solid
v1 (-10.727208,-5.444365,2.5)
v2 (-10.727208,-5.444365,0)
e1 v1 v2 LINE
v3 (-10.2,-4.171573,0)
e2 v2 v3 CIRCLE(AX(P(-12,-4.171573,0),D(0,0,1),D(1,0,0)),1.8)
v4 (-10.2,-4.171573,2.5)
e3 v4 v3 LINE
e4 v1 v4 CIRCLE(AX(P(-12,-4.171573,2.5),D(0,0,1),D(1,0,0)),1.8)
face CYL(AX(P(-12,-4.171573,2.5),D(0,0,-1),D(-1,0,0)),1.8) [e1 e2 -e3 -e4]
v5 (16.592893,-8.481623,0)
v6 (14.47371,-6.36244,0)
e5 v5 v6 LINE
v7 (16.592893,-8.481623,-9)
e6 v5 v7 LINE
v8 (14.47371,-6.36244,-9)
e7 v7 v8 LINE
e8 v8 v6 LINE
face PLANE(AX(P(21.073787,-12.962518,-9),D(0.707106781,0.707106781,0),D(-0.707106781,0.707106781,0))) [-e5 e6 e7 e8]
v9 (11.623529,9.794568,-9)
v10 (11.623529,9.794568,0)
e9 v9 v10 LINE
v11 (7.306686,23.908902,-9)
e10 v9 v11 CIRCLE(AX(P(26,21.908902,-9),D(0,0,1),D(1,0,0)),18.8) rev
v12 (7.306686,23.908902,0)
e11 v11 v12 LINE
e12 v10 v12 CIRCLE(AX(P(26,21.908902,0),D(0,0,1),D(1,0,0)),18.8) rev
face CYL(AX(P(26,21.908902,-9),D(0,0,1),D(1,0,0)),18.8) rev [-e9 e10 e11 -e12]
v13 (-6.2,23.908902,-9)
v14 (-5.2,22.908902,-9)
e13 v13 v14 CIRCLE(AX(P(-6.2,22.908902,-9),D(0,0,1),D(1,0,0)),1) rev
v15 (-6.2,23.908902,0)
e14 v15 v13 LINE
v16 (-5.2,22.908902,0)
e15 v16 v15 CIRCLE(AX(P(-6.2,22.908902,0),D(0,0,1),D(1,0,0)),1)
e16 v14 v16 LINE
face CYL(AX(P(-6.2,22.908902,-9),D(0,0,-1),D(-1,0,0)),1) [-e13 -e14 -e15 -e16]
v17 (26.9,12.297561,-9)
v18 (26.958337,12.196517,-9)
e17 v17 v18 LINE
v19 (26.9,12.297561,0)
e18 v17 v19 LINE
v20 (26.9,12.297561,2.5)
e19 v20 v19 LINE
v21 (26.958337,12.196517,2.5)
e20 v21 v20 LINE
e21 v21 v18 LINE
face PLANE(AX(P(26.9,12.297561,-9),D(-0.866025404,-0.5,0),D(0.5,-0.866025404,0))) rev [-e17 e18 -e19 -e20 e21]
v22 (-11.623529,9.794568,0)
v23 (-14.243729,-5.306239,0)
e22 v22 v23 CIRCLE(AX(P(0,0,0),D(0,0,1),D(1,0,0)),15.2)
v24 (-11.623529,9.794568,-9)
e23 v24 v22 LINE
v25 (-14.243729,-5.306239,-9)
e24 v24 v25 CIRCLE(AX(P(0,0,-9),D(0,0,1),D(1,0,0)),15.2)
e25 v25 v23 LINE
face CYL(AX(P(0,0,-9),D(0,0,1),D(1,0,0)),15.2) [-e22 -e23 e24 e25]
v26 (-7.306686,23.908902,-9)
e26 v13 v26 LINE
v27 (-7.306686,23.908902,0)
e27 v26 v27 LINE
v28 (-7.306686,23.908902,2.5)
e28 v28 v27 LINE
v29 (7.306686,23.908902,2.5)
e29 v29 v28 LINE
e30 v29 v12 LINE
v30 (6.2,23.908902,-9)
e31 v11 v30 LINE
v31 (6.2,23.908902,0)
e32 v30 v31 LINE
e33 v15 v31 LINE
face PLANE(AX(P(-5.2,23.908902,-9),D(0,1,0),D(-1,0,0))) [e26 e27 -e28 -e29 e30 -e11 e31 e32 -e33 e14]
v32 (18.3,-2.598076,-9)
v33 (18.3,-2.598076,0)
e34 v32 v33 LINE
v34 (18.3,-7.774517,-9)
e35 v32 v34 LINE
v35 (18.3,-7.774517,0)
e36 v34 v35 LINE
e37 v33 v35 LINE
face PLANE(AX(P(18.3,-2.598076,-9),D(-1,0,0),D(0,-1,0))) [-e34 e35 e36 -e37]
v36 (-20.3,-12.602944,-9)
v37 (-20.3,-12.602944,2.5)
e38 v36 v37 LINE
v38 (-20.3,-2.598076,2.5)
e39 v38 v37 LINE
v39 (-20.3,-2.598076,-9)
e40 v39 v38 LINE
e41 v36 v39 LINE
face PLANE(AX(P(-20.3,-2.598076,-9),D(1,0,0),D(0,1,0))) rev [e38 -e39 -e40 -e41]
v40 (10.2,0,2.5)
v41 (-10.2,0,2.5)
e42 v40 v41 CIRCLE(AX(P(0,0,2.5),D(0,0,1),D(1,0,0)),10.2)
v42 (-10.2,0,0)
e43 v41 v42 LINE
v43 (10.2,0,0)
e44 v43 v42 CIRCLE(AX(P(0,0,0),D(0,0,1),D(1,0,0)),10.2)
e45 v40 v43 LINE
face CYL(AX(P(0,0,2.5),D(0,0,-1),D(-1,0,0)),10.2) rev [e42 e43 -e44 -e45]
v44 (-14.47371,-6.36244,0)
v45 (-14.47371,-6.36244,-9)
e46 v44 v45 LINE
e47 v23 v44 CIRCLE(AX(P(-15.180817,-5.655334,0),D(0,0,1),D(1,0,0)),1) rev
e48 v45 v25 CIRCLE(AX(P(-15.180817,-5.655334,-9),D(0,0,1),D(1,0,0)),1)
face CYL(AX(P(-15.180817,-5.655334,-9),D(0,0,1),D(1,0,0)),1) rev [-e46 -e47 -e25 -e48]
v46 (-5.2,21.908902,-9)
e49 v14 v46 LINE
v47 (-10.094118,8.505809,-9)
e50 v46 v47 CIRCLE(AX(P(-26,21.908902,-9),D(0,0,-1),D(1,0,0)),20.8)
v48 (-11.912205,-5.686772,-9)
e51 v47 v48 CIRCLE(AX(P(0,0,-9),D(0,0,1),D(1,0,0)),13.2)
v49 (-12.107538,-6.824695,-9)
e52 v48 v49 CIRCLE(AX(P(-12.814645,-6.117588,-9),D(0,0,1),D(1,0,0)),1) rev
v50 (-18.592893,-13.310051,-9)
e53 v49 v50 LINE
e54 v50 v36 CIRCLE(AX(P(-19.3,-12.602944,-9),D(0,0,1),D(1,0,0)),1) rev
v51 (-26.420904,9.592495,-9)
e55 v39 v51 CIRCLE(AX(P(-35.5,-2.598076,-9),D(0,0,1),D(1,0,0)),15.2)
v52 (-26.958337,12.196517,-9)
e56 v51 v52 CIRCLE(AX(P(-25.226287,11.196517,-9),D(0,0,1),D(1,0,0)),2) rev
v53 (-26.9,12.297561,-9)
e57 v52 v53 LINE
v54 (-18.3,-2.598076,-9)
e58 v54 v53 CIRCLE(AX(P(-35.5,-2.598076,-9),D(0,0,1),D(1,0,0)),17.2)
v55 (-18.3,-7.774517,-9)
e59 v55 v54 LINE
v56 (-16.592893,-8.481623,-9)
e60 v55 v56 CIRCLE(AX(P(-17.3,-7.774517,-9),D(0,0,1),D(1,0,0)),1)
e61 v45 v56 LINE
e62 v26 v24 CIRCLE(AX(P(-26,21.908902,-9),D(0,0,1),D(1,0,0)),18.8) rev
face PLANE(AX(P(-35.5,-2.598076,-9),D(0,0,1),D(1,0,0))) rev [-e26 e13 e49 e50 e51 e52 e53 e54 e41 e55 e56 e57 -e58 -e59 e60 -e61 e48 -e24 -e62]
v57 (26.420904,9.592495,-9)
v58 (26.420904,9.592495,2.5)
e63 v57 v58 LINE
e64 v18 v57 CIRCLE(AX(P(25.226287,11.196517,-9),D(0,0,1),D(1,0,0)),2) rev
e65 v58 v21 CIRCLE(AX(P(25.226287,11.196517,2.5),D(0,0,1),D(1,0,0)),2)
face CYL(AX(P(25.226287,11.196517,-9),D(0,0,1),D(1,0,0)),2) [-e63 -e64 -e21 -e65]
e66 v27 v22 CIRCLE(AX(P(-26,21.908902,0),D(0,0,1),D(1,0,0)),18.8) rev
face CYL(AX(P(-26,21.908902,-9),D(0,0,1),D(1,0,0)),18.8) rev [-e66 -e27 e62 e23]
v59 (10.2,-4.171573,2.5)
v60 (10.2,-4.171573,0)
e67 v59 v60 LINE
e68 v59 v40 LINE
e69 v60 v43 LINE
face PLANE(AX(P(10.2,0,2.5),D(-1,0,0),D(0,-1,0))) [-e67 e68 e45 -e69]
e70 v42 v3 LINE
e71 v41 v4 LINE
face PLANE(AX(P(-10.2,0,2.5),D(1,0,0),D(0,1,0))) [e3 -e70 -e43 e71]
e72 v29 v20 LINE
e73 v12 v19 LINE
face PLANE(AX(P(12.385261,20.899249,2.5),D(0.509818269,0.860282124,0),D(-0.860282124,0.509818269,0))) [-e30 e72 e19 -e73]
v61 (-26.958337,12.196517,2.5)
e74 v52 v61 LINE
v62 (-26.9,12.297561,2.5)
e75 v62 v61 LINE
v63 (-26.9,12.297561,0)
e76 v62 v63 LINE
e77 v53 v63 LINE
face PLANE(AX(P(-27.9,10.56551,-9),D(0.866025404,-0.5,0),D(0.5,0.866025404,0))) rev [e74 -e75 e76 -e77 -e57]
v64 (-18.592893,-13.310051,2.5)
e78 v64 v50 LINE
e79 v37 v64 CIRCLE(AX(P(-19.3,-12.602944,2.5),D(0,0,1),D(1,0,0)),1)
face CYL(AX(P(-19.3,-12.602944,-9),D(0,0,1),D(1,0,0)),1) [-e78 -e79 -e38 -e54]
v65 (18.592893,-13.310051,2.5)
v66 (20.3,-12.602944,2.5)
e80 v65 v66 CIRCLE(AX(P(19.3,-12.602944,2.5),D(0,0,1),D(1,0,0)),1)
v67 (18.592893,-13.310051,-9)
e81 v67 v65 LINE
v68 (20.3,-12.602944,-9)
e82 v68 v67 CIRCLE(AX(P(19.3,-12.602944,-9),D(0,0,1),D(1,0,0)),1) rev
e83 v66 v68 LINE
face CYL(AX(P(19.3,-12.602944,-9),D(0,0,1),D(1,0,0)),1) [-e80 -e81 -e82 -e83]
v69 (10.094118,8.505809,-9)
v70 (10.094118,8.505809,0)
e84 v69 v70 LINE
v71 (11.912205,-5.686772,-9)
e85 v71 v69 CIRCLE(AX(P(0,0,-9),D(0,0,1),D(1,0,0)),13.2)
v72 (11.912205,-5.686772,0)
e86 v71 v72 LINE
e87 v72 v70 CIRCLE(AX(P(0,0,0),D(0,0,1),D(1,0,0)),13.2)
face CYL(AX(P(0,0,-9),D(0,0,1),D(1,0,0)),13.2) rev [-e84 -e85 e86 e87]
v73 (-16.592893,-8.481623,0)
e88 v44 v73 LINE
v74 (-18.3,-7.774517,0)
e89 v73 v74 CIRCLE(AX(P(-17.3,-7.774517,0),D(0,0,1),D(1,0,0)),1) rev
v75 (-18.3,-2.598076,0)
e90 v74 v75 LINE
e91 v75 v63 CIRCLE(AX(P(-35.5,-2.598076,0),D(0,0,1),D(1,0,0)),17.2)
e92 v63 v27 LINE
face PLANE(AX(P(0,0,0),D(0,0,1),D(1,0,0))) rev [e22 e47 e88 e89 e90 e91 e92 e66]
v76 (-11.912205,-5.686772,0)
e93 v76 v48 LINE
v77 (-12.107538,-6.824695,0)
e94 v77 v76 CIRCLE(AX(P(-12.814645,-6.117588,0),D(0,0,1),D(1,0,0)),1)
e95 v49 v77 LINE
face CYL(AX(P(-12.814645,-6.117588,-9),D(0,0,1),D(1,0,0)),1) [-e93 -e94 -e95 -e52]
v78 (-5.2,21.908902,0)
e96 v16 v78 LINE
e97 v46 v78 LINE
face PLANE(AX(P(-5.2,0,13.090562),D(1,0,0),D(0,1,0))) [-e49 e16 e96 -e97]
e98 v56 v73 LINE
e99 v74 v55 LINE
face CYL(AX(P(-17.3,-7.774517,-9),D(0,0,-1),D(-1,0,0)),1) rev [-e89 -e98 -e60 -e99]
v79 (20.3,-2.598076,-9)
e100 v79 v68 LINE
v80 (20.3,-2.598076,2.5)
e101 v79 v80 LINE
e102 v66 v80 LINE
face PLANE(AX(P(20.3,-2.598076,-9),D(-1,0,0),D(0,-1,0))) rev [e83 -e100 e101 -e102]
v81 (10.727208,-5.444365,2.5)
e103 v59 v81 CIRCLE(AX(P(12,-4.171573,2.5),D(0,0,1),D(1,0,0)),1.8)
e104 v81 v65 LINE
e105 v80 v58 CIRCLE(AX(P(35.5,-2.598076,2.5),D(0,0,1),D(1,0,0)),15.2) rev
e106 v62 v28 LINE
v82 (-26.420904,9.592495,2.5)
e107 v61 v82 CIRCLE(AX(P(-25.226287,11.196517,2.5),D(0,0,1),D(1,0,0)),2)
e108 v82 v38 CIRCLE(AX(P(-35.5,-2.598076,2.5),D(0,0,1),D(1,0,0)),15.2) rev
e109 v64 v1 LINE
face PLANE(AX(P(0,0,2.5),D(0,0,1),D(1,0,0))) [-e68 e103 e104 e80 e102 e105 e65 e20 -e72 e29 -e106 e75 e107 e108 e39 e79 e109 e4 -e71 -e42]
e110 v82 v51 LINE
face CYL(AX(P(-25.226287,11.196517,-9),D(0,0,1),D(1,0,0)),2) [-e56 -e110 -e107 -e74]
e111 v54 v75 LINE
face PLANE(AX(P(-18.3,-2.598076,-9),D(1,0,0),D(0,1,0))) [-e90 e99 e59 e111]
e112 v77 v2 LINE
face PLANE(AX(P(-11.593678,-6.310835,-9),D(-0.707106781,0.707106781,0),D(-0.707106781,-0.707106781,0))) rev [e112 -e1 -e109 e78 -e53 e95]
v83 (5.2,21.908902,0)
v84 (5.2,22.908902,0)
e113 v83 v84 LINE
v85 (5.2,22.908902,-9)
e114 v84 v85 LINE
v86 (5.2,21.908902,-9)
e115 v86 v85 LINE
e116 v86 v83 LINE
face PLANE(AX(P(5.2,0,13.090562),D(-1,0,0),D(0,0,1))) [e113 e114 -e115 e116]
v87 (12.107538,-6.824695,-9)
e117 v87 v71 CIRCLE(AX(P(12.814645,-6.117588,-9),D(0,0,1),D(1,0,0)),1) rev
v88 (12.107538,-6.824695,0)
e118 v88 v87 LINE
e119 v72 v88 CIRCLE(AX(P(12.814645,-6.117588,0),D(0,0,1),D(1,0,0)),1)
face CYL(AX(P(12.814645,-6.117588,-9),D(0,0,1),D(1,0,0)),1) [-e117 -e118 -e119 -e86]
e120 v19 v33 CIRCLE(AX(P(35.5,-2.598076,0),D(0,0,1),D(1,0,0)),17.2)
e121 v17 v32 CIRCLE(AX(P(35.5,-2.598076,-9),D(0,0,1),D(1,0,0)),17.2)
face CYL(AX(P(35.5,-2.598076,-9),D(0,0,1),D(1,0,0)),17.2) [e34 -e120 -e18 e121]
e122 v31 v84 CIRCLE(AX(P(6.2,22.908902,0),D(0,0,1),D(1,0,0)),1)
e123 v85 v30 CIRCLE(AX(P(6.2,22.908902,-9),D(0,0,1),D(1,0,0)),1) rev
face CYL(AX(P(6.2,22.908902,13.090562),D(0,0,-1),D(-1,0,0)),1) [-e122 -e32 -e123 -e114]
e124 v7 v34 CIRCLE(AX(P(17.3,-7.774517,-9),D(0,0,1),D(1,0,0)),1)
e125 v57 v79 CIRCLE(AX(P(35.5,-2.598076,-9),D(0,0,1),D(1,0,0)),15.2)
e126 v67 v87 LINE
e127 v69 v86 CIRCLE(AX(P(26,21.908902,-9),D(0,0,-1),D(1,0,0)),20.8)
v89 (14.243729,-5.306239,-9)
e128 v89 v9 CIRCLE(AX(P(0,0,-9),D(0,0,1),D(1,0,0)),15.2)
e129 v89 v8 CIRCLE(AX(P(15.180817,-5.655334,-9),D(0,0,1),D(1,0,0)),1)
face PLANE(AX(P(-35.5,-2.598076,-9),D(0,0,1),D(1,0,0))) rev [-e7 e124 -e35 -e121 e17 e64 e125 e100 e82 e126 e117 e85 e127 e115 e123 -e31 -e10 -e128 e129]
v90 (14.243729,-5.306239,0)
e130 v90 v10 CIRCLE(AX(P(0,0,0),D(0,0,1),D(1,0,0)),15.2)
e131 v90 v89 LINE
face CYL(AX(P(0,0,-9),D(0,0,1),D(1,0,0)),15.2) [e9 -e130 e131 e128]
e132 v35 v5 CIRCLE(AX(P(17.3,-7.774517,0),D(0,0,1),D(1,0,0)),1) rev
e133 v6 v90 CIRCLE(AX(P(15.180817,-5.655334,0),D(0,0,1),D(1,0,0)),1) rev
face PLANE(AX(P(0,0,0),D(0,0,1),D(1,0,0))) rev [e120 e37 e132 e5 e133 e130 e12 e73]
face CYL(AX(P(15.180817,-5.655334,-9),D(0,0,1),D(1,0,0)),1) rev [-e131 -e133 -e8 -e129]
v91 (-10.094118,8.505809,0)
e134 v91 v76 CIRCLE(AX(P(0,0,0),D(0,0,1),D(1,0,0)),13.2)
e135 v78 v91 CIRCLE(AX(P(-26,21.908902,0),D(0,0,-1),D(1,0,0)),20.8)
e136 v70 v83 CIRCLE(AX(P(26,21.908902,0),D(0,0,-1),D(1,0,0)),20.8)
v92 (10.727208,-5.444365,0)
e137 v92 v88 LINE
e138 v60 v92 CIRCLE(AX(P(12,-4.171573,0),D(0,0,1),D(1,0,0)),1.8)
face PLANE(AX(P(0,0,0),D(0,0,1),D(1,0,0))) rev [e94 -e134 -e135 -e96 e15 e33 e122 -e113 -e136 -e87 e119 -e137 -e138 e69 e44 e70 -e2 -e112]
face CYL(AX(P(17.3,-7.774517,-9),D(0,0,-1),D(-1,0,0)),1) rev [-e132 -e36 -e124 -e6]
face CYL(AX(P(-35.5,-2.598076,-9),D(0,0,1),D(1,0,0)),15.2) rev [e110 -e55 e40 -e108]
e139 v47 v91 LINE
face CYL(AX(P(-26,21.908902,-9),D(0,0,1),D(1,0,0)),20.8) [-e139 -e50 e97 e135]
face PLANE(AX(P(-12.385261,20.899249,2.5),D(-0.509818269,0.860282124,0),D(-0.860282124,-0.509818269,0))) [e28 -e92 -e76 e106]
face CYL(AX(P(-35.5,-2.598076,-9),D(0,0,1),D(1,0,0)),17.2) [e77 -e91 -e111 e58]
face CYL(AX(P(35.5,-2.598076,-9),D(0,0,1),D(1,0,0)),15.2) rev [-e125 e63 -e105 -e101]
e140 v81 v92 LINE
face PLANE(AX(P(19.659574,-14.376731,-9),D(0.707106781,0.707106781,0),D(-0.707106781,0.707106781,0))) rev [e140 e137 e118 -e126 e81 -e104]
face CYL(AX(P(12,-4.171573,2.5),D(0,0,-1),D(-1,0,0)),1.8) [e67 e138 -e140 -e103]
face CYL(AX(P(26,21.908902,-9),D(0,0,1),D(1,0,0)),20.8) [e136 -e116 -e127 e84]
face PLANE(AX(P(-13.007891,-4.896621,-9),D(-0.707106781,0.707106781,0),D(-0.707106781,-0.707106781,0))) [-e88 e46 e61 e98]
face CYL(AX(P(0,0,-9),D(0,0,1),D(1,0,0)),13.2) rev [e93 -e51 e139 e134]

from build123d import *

# Parameters (mm, degrees)
EXTRUDE_THIN1_DEPTH = 9
BOSS_EXTRUDE1_START = 2.5
BOSS_EXTRUDE1_DEPTH = 2.5
SKETCH7_W           = 10.4
SKETCH7_H           = 2
CUT_EXTRUDE2_DEPTH  = 9
FILLET1_R           = 2
FILLET2_R           = 1
FILLET3_R           = 1


with BuildPart() as part:
    # Sketch4 → Extrude-Thin1 (new body)
    with BuildSketch(Plane.XY):
        with BuildLine():
            ThreePointArc((-27.9, 10.565509926), (-22.336413862, 5.001923789), (-20.3, -2.598076211))
            Line((-20.3, -2.598076211), (-20.3, -13))
            ThreePointArc((-20.3, -13), (-20.132058957, -13.759199288), (-19.659573823, -14.37673111))
            Line((-19.659573823, -14.37673111), (-11.593677676, -6.310834964))
            ThreePointArc((-11.593677676, -6.310834964), (-13.132911027, 1.329153101), (-10.094117647, 8.505809128))
            ThreePointArc((-10.094117647, 8.505809128), (-6.461802118, 14.774561158), (-5.2, 21.9089023))
            Line((-5.2, 21.9089023), (5.2, 21.9089023))
            ThreePointArc((5.2, 21.9089023), (6.461802118, 14.774561158), (10.094117647, 8.505809128))
            ThreePointArc((10.094117647, 8.505809128), (13.132911027, 1.329153101), (11.593677676, -6.310834964))
            Line((11.593677676, -6.310834964), (19.659573823, -14.37673111))
            ThreePointArc((19.659573823, -14.37673111), (20.132058957, -13.759199288), (20.3, -13))
            Line((20.3, -13), (20.3, -2.598076211))
            ThreePointArc((20.3, -2.598076211), (22.336413862, 5.001923789), (27.9, 10.565509926))
            Line((27.9, 10.565509926), (26.9, 12.297560734))
            ThreePointArc((26.9, 12.297560734), (20.604363055, 6.001923789), (18.3, -2.598076211))
            Line((18.3, -2.598076211), (18.3, -10.188730163))
            Line((18.3, -10.188730163), (14.009117998, -5.897848161))
            ThreePointArc((14.009117998, -5.897848161), (15.027346247, 2.28448348), (11.623529412, 9.794568087))
            ThreePointArc((11.623529412, 9.794568087), (8.022061411, 16.410382128), (7.306685687, 23.9089023))
            Line((7.306685687, 23.9089023), (-7.306685687, 23.9089023))
            ThreePointArc((-7.306685687, 23.9089023), (-8.022061411, 16.410382128), (-11.623529412, 9.794568087))
            ThreePointArc((-11.623529412, 9.794568087), (-15.027346247, 2.28448348), (-14.009117998, -5.897848161))
            Line((-14.009117998, -5.897848161), (-18.3, -10.188730163))
            Line((-18.3, -10.188730163), (-18.3, -2.598076211))
            ThreePointArc((-18.3, -2.598076211), (-20.604363055, 6.001923789), (-26.9, 12.297560734))
            Line((-26.9, 12.297560734), (-27.9, 10.565509926))
        make_face()
    extrude(amount=-EXTRUDE_THIN1_DEPTH)

    # Sketch5 → Boss-Extrude1 (add)
    with BuildSketch(Plane.XY.offset(BOSS_EXTRUDE1_START)):
        with BuildLine():
            Line((-26.9, 12.297560734), (-7.306685687, 23.9089023))
            ThreePointArc((-7.306685687, 23.9089023), (-8.022061411, 16.410382128), (-11.623529412, 9.794568087))
            ThreePointArc((-11.623529412, 9.794568087), (-15.027346247, 2.28448348), (-14.009117998, -5.897848161))
            Line((-14.009117998, -5.897848161), (-18.3, -10.188730163))
            Line((-18.3, -10.188730163), (-18.3, -2.598076211))
            ThreePointArc((-18.3, -2.598076211), (-20.604363055, 6.001923789), (-26.9, 12.297560734))
        make_face()
        with BuildLine():
            ThreePointArc((-18.3, -2.598076211), (-20.604363055, 6.001923789), (-26.9, 12.297560734))
            Line((-26.9, 12.297560734), (-27.9, 10.565509926))
            ThreePointArc((-27.9, 10.565509926), (-22.336413862, 5.001923789), (-20.3, -2.598076211))
            Line((-20.3, -2.598076211), (-20.3, -13))
            ThreePointArc((-20.3, -13), (-20.132058957, -13.759199288), (-19.659573823, -14.37673111))
            Line((-19.659573823, -14.37673111), (-19.555634919, -14.272792206))
            Line((-19.555634919, -14.272792206), (-11.593677676, -6.310834964))
            ThreePointArc((-11.593677676, -6.310834964), (-13.132911027, 1.329153101), (-10.094117647, 8.505809128))
            ThreePointArc((-10.094117647, 8.505809128), (-6.461802118, 14.774561158), (-5.2, 21.9089023))
            Line((-5.2, 21.9089023), (5.2, 21.9089023))
            ThreePointArc((5.2, 21.9089023), (6.461802118, 14.774561158), (10.094117647, 8.505809128))
            ThreePointArc((10.094117647, 8.505809128), (13.132911027, 1.329153101), (11.593677676, -6.310834964))
            Line((11.593677676, -6.310834964), (19.555634919, -14.272792206))
            Line((19.555634919, -14.272792206), (19.659573823, -14.37673111))
            ThreePointArc((19.659573823, -14.37673111), (20.132058957, -13.759199288), (20.3, -13))
            Line((20.3, -13), (20.3, -2.598076211))
            ThreePointArc((20.3, -2.598076211), (22.336413862, 5.001923789), (27.9, 10.565509926))
            Line((27.9, 10.565509926), (26.9, 12.297560734))
            ThreePointArc((26.9, 12.297560734), (20.604363055, 6.001923789), (18.3, -2.598076211))
            Line((18.3, -2.598076211), (18.3, -10.188730163))
            Line((18.3, -10.188730163), (14.009117998, -5.897848161))
            ThreePointArc((14.009117998, -5.897848161), (15.027346247, 2.28448348), (11.623529412, 9.794568087))
            ThreePointArc((11.623529412, 9.794568087), (8.022061411, 16.410382128), (7.306685687, 23.9089023))
            Line((7.306685687, 23.9089023), (-7.306685687, 23.9089023))
            ThreePointArc((-7.306685687, 23.9089023), (-8.022061411, 16.410382128), (-11.623529412, 9.794568087))
            ThreePointArc((-11.623529412, 9.794568087), (-15.027346247, 2.28448348), (-14.009117998, -5.897848161))
            Line((-14.009117998, -5.897848161), (-18.3, -10.188730163))
            Line((-18.3, -10.188730163), (-18.3, -2.598076211))
        make_face()
        with BuildLine():
            Line((7.306685687, 23.9089023), (26.9, 12.297560734))
            ThreePointArc((26.9, 12.297560734), (20.604363055, 6.001923789), (18.3, -2.598076211))
            Line((18.3, -2.598076211), (18.3, -10.188730163))
            Line((18.3, -10.188730163), (14.009117998, -5.897848161))
            ThreePointArc((14.009117998, -5.897848161), (15.027346247, 2.28448348), (11.623529412, 9.794568087))
            ThreePointArc((11.623529412, 9.794568087), (8.022061411, 16.410382128), (7.306685687, 23.9089023))
        make_face()
        with BuildLine():
            ThreePointArc((-10.094117647, 8.505809128), (-13.132911027, 1.329153101), (-11.593677676, -6.310834964))
            Line((-11.593677676, -6.310834964), (-10.727207794, -5.444365081))
            ThreePointArc((-10.727207794, -5.444365081), (-10.337016841, -4.860403054), (-10.2, -4.171572875))
            Line((-10.2, -4.171572875), (-10.2, 0))
            ThreePointArc((-10.2, 0), (0, 10.2), (10.2, 0))
            Line((10.2, 0), (10.2, -4.171572875))
            ThreePointArc((10.2, -4.171572875), (10.337016841, -4.860403054), (10.727207794, -5.444365081))
            Line((10.727207794, -5.444365081), (11.593677676, -6.310834964))
            ThreePointArc((11.593677676, -6.310834964), (13.132911027, 1.329153101), (10.094117647, 8.505809128))
            ThreePointArc((10.094117647, 8.505809128), (6.461802118, 14.774561158), (5.2, 21.9089023))
            Line((5.2, 21.9089023), (-5.2, 21.9089023))
            ThreePointArc((-5.2, 21.9089023), (-6.461802118, 14.774561158), (-10.094117647, 8.505809128))
        make_face()
    extrude(amount=-BOSS_EXTRUDE1_DEPTH)

    # Sketch7 → Cut-Extrude2 (cut)
    with BuildSketch(Plane.XY.offset(-9)):
        with Locations((0, 22.9089023)):
            Rectangle(SKETCH7_W, SKETCH7_H)
    extrude(amount=CUT_EXTRUDE2_DEPTH, mode=Mode.SUBTRACT)

    # Fillet1
    fillet1_edges = [part.edges().sort_by_distance(p)[0] for p in [
        (27.9, 10.565509926, -3.25),
        (-27.9, 10.565509926, -3.25),
    ]]
    fillet(fillet1_edges, radius=FILLET1_R)

    # Fillet2
    # the kernel refuses this fillet: 1 mm, written as the material it takes off along each edge
    with BuildSketch(Plane(origin=(19.659573823, -14.37673111, -13.714649626), x_dir=(0.33959372810271005, 0.9405722193608009, 0), z_dir=(0, 0, 1))) as fillet2_piece_1:
        with BuildLine():
            CenterArc((1.546266122, 0.940572219), FILLET2_R, 154.852123731, 135)
            Line((0.6410521, 1.365528186), (0.550530698, 1.408023783))
            Line((0.550530698, 1.408023783), (-0.090521402, 0.042495597))
            Line((-0.090521402, 0.042495597), (-0.050062835, -0.086566232))
            ThreePointArc((-0.050062835, -0.086566232), (1.546359122, -0.228895043), (1.919819223, -0.094057222))
            Line((1.919819223, -0.094057222), (1.885859851, 0))
        make_face()
    extrude(amount=20.929299253, mode=Mode.SUBTRACT)
    with BuildSketch(Plane(origin=(-19.659573823, -14.37673111, -13.714649626), x_dir=(-0.3395937281027359, 0.9405722193607915, 0), z_dir=(0, 0, 1))) as fillet2_piece_2:
        with BuildLine():
            CenterArc((1.546266122, -0.940572219), FILLET2_R, 70.147876269, 135)
            Line((0.6410521, -1.365528186), (0.550530698, -1.408023783))
            Line((0.550530698, -1.408023783), (-0.090521402, -0.042495597))
            Line((-0.090521402, -0.042495597), (-0.050062835, 0.086566232))
            ThreePointArc((-0.050062835, 0.086566232), (1.546359122, 0.228895043), (1.919819223, 0.094057222))
            Line((1.919819223, 0.094057222), (1.885859851, 0))
        make_face()
    extrude(amount=20.929299253, mode=Mode.SUBTRACT)

    # Fillet3
    fillet3_edges = [part.edges().sort_by_distance(p)[0] for p in [
        (-5.2, 23.9089023, -4.5),
        (5.2, 23.9089023, -4.5),
        (-18.3, -10.188730163, -4.5),
        (-14.009117998, -5.897848161, -4.5),
        (14.009117998, -5.897848161, -4.5),
        (18.3, -10.188730163, -4.5),
        (11.593677676, -6.310834964, -4.5),
        (-11.593677676, -6.310834964, -4.5),
    ]]
    fillet(fillet3_edges, radius=FILLET3_R)


solid = part.part
